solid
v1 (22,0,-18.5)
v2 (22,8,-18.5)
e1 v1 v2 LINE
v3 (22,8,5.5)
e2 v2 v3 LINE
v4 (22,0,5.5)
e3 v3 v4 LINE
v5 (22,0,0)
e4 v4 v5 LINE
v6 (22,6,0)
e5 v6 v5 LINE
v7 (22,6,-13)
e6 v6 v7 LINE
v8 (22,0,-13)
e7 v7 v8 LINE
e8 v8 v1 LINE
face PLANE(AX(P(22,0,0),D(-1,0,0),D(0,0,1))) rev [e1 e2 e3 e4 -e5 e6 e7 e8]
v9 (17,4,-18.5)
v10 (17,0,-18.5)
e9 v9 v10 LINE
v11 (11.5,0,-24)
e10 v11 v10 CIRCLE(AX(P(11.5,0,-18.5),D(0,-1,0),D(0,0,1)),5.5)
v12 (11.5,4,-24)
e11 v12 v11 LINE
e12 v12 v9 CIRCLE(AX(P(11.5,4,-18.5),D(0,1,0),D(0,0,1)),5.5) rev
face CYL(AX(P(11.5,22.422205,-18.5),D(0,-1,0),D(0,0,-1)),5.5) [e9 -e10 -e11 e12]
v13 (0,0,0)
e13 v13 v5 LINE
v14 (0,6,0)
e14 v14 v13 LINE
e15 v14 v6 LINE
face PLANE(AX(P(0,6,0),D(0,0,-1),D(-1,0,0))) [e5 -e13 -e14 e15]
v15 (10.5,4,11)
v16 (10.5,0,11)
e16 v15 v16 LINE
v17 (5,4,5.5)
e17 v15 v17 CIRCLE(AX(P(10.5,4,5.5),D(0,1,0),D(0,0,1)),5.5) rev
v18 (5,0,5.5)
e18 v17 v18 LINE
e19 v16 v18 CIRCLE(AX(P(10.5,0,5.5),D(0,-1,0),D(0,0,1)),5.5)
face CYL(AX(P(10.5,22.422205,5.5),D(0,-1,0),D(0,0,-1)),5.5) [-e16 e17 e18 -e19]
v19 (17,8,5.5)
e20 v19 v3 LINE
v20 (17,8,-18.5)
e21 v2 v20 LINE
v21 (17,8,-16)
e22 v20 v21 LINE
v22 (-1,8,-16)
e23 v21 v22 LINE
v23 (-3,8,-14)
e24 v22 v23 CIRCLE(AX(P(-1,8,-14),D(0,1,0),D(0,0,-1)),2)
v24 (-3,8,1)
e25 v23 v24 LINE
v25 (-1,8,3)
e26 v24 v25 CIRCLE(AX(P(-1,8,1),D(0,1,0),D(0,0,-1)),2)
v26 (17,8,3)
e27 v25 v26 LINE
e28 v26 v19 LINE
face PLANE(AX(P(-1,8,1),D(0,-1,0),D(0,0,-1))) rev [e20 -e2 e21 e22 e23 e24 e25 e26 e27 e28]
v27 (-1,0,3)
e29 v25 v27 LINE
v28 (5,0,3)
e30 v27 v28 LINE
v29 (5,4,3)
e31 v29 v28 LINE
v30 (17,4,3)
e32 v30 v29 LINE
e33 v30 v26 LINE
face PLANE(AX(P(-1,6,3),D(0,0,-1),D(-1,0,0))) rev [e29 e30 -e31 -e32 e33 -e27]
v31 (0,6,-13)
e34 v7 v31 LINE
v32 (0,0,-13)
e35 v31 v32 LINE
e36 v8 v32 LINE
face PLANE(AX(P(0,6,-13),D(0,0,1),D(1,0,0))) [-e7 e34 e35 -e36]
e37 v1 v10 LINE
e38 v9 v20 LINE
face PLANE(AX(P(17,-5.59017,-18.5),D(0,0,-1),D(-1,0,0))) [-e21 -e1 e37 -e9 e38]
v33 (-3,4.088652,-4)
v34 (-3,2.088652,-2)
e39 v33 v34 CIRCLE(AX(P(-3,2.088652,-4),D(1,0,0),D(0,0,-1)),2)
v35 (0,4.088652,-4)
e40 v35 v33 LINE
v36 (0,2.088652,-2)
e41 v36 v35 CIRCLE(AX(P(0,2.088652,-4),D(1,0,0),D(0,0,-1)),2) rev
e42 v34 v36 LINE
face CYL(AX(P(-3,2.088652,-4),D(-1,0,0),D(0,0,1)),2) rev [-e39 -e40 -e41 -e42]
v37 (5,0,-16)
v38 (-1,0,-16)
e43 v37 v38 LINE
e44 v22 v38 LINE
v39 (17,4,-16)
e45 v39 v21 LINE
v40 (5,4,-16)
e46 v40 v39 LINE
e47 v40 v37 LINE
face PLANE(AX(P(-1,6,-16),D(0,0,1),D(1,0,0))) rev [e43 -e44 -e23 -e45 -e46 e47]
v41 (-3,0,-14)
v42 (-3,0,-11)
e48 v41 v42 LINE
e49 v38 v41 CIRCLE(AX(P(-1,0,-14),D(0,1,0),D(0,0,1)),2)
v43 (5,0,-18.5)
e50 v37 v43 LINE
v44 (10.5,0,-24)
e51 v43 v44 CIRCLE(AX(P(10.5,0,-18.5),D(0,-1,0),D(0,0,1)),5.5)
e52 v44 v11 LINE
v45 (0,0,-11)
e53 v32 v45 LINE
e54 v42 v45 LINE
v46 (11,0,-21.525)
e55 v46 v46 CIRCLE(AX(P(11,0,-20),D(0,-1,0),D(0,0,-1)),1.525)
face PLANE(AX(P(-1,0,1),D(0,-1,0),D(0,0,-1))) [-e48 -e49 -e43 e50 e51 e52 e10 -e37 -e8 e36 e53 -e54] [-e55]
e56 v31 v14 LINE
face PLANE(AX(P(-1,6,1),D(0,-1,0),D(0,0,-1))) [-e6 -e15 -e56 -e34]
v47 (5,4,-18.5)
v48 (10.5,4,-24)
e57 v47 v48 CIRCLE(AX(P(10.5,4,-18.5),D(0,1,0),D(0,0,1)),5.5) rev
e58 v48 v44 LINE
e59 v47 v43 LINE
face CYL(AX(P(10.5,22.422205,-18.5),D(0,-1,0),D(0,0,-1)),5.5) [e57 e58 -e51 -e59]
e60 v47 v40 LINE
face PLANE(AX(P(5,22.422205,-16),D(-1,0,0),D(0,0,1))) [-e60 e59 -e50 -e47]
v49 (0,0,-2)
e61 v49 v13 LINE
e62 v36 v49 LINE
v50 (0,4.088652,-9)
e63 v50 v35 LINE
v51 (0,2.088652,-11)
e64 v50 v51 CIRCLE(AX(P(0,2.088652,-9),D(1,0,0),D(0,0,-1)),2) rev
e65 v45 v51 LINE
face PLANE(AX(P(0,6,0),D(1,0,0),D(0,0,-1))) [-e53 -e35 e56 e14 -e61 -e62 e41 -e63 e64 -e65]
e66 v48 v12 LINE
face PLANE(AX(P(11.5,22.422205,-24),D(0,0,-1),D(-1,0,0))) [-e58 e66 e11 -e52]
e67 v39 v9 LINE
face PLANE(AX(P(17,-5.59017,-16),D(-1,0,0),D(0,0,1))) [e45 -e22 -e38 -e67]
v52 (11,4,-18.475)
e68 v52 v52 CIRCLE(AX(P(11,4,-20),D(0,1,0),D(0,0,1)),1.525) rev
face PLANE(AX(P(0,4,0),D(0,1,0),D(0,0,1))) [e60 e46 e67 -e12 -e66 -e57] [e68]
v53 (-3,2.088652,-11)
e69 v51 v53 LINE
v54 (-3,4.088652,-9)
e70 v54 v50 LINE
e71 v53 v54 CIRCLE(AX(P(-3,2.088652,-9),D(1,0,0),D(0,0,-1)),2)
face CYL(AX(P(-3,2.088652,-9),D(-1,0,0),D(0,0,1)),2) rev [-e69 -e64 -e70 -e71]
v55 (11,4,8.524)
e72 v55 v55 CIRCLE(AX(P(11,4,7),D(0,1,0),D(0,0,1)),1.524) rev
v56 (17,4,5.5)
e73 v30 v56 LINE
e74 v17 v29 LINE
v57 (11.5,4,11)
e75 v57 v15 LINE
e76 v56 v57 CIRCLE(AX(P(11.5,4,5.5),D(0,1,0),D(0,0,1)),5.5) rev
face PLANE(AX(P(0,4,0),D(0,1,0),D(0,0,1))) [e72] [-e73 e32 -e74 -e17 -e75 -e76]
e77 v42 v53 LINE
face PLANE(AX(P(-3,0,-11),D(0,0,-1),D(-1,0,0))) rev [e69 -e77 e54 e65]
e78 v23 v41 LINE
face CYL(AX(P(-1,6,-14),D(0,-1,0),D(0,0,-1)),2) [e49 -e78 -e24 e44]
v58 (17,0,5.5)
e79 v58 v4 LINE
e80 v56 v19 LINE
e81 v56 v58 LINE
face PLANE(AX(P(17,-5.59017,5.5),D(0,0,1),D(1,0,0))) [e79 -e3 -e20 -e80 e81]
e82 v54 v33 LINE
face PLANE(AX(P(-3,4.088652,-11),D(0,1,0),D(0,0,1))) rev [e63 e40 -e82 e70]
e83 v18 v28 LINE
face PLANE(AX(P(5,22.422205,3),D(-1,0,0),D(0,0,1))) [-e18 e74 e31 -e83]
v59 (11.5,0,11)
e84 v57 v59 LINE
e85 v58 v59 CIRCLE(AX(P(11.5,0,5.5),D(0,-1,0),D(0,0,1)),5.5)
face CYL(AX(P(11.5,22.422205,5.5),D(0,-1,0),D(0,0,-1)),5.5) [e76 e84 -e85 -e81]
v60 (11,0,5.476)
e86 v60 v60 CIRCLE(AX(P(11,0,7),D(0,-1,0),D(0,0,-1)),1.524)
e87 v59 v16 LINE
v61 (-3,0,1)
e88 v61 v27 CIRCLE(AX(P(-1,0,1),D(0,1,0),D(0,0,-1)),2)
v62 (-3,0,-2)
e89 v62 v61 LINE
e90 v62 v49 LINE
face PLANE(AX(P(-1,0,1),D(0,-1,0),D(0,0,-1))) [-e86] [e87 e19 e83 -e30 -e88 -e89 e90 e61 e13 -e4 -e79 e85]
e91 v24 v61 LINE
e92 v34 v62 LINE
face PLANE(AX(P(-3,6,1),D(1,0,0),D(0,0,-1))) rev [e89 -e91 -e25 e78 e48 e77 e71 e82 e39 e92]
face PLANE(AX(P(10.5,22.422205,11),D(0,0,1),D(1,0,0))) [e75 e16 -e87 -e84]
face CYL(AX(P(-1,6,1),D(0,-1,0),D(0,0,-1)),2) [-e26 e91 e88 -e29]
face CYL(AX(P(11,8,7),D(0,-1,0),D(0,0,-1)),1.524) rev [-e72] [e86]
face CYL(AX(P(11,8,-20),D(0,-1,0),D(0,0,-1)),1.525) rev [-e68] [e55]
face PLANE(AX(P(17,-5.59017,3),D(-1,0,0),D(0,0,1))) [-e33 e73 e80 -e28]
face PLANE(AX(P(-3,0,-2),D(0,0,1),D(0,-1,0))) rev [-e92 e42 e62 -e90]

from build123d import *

# Parameters (mm, degrees)
SKETCH1_W           = 22
SKETCH1_H           = 13
BOSS_EXTRUDE1_DEPTH = 6
BOSS_EXTRUDE2_DEPTH = 2
BOSS_EXTRUDE3_DEPTH = 8
SKETCH4_R           = 1.525
SKETCH4_R_2         = 1.524
CUT_EXTRUDE1_DEPTH  = 36.566838488
SKETCH5_W           = 9
SKETCH5_H           = 4.088652256
CUT_EXTRUDE2_DEPTH  = 38.735924528
FILLET1_R           = 2
SKETCH6_W           = 12
SKETCH6_H           = 13.009000019
SKETCH6_W_2         = 15.838286437
CUT_EXTRUDE3_DEPTH  = 4
SKETCH7_W           = 2.5
SKETCH7_H           = 8
BOSS_EXTRUDE5_DEPTH = 3
FILLET3_R           = 2.5
FILLET4_R           = 2.5
SKETCH9_W           = 24
SKETCH9_H           = 8
CUT_EXTRUDE5_DEPTH  = 3
BOSS_EXTRUDE6_REACH = 35.526
SKETCH10_W          = 5
SKETCH10_H          = 2.5


with BuildPart() as part:
    # Sketch1 → Boss-Extrude1 (new body)
    with BuildSketch(Plane(origin=(0, 0, 0), x_dir=(1, 0, 0), z_dir=(0, 1, 0))):
        with BuildLine():
            Line((-1, -3), (23, -3))
            Line((23, -3), (25, -3))
            Line((25, -3), (25, -1))
            Line((25, -1), (25, 14))
            Line((25, 14), (25, 16))
            Line((25, 16), (23, 16))
            Line((23, 16), (-1, 16))
            ThreePointArc((-1, 16), (-2.414213562, 15.414213562), (-3, 14))
            Line((-3, 14), (-3, -1))
            ThreePointArc((-3, -1), (-2.414213562, -2.414213562), (-1, -3))
        make_face()
        with Locations((11, 6.5)):
            Rectangle(SKETCH1_W, SKETCH1_H, mode=Mode.SUBTRACT)
    extrude(amount=BOSS_EXTRUDE1_DEPTH)

    # Sketch2 → Boss-Extrude2 (add)
    with BuildSketch(Plane(origin=(0, 6, 0), x_dir=(1, 0, 0), z_dir=(0, 1, 0))):
        with BuildLine():
            Line((25, 14), (25, -1))
            Line((25, -1), (25, -3))
            Line((25, -3), (23, -3))
            Line((23, -3), (-1, -3))
            ThreePointArc((-1, -3), (-2.414213562, -2.414213562), (-3, -1))
            Line((-3, -1), (-3, 14))
            ThreePointArc((-3, 14), (-2.414213562, 15.414213562), (-1, 16))
            Line((-1, 16), (23, 16))
            Line((23, 16), (25, 16))
            Line((25, 16), (25, 14))
        make_face()
    extrude(amount=BOSS_EXTRUDE2_DEPTH)

    # Sketch3 → Boss-Extrude3 (add)
    with BuildSketch(Plane.XZ):
        with BuildLine():
            Line((5, 3), (17, 3))
            Line((17, 3), (17, 5.5))
            ThreePointArc((17, 5.5), (15.389087297, 9.389087297), (11.5, 11))
            Line((11.5, 11), (10.5, 11))
            ThreePointArc((10.5, 11), (6.610912703, 9.389087297), (5, 5.5))
            Line((5, 5.5), (5, 3))
        make_face()
        with BuildLine():
            Line((17, -16), (5, -16))
            Line((5, -16), (5, -18.5))
            ThreePointArc((5, -18.5), (6.610912703, -22.389087297), (10.5, -24))
            Line((10.5, -24), (11.5, -24))
            ThreePointArc((11.5, -24), (15.389087297, -22.389087297), (17, -18.5))
            Line((17, -18.5), (17, -16))
        make_face()
    extrude(amount=-BOSS_EXTRUDE3_DEPTH)

    # Sketch4 → Cut-Extrude1 (cut, through all)
    with BuildSketch(Plane(origin=(0, 0, 0), x_dir=(-1, 0, 0), z_dir=(0, -1, 0))):
        with Locations(Location((-11, 20, 0), (0, 0, 90))):
            Circle(SKETCH4_R)
        with Locations(Location((-11, -7, 0), (0, 0, 90))):
            Circle(SKETCH4_R_2)
    extrude(amount=-CUT_EXTRUDE1_DEPTH, mode=Mode.SUBTRACT)

    # Sketch5 → Cut-Extrude2 (cut, through all)
    with BuildSketch(Plane(origin=(25, 0, 0), x_dir=(0, 0, -1), z_dir=(1, 0, 0))):
        with Locations((6.5, 2.044326128)):
            Rectangle(SKETCH5_W, SKETCH5_H)
    extrude(amount=-CUT_EXTRUDE2_DEPTH, mode=Mode.SUBTRACT)

    # Fillet1
    fillet1_edges = [part.edges().sort_by_distance(p)[0] for p in [
        (-1.5, 4.088652256, -11),
        (-1.5, 4.088652256, -2),
        (23.5, 4.088652256, -11),
        (23.5, 4.088652256, -2),
    ]]
    fillet(fillet1_edges, radius=FILLET1_R)

    # Sketch6 → Cut-Extrude3 (cut)
    with BuildSketch(Plane(origin=(0, 8, 0), x_dir=(1, 0, 0), z_dir=(0, 1, 0))):
        with Locations((11, 22.504500009)):
            Rectangle(SKETCH6_W, SKETCH6_H)
        with Locations((11.149066226, -9.50450001)):
            Rectangle(SKETCH6_W_2, SKETCH6_H)
    extrude(amount=-CUT_EXTRUDE3_DEPTH, mode=Mode.SUBTRACT)

    # Sketch7 → Boss-Extrude5 (add)
    with BuildSketch(Plane(origin=(25, 0, 0), x_dir=(0, 0, -1), z_dir=(1, 0, 0))):
        with Locations((17.25, 4)):
            Rectangle(SKETCH7_W, SKETCH7_H)
        with Locations((-4.25, 4)):
            Rectangle(SKETCH7_W, SKETCH7_H)
    extrude(amount=-BOSS_EXTRUDE5_DEPTH)

    # Fillet3
    fillet3_edges = [part.edges().sort_by_distance(p)[0] for p in [
        (22, 4, -16),
    ]]
    fillet(fillet3_edges, radius=FILLET3_R - 0.0001)  # a hair under: the kernel refuses the full size

    # Fillet4
    fillet4_edges = [part.edges().sort_by_distance(p)[0] for p in [
        (22, 4, 3),
    ]]
    fillet(fillet4_edges, radius=FILLET4_R - 0.0001)  # a hair under: the kernel refuses the full size

    # Sketch9 → Cut-Extrude5 (cut)
    with BuildSketch(Plane(origin=(25, 0, 0), x_dir=(0, 0, -1), z_dir=(1, 0, 0))):
        with Locations((6.5, 4)):
            Rectangle(SKETCH9_W, SKETCH9_H)
    extrude(amount=-CUT_EXTRUDE5_DEPTH, mode=Mode.SUBTRACT)

    # Boss-Extrude6: up to this face of the body (flat: up to its plane)
    boss_extrude6_end = Plane(part.part.faces().sort_by_distance((9.97036164, 0, 3.836684907))[0])
    # Sketch10 → Boss-Extrude6 (add, up to the picked face)
    with BuildSketch(Plane(origin=(0, 8, 0), x_dir=(1, 0, 0), z_dir=(0, 1, 0)), mode=Mode.PRIVATE) as boss_extrude6_sk1:
        with Locations((19.5, 17.25)):
            Rectangle(SKETCH10_W, SKETCH10_H)
    boss_extrude6_tool1 = split(extrude(boss_extrude6_sk1.sketch, amount=-BOSS_EXTRUDE6_REACH, mode=Mode.PRIVATE), bisect_by=boss_extrude6_end, keep=Keep.BOTH, mode=Mode.PRIVATE)
    # Sketch10 → Boss-Extrude6 (add, up to the picked face)
    with BuildSketch(Plane(origin=(0, 8, 0), x_dir=(1, 0, 0), z_dir=(0, 1, 0)), mode=Mode.PRIVATE) as boss_extrude6_sk2:
        with Locations((19.5, -4.25)):
            Rectangle(SKETCH10_W, SKETCH10_H)
    boss_extrude6_tool2 = split(extrude(boss_extrude6_sk2.sketch, amount=-BOSS_EXTRUDE6_REACH, mode=Mode.PRIVATE), bisect_by=boss_extrude6_end, keep=Keep.BOTH, mode=Mode.PRIVATE)
    add(boss_extrude6_tool1.solids().sort_by(Axis((19.5, 8, -17.25), (0, -1, 0)))[0])
    add(boss_extrude6_tool2.solids().sort_by(Axis((19.5, 8, 4.25), (0, -1, 0)))[0])


solid = part.part
